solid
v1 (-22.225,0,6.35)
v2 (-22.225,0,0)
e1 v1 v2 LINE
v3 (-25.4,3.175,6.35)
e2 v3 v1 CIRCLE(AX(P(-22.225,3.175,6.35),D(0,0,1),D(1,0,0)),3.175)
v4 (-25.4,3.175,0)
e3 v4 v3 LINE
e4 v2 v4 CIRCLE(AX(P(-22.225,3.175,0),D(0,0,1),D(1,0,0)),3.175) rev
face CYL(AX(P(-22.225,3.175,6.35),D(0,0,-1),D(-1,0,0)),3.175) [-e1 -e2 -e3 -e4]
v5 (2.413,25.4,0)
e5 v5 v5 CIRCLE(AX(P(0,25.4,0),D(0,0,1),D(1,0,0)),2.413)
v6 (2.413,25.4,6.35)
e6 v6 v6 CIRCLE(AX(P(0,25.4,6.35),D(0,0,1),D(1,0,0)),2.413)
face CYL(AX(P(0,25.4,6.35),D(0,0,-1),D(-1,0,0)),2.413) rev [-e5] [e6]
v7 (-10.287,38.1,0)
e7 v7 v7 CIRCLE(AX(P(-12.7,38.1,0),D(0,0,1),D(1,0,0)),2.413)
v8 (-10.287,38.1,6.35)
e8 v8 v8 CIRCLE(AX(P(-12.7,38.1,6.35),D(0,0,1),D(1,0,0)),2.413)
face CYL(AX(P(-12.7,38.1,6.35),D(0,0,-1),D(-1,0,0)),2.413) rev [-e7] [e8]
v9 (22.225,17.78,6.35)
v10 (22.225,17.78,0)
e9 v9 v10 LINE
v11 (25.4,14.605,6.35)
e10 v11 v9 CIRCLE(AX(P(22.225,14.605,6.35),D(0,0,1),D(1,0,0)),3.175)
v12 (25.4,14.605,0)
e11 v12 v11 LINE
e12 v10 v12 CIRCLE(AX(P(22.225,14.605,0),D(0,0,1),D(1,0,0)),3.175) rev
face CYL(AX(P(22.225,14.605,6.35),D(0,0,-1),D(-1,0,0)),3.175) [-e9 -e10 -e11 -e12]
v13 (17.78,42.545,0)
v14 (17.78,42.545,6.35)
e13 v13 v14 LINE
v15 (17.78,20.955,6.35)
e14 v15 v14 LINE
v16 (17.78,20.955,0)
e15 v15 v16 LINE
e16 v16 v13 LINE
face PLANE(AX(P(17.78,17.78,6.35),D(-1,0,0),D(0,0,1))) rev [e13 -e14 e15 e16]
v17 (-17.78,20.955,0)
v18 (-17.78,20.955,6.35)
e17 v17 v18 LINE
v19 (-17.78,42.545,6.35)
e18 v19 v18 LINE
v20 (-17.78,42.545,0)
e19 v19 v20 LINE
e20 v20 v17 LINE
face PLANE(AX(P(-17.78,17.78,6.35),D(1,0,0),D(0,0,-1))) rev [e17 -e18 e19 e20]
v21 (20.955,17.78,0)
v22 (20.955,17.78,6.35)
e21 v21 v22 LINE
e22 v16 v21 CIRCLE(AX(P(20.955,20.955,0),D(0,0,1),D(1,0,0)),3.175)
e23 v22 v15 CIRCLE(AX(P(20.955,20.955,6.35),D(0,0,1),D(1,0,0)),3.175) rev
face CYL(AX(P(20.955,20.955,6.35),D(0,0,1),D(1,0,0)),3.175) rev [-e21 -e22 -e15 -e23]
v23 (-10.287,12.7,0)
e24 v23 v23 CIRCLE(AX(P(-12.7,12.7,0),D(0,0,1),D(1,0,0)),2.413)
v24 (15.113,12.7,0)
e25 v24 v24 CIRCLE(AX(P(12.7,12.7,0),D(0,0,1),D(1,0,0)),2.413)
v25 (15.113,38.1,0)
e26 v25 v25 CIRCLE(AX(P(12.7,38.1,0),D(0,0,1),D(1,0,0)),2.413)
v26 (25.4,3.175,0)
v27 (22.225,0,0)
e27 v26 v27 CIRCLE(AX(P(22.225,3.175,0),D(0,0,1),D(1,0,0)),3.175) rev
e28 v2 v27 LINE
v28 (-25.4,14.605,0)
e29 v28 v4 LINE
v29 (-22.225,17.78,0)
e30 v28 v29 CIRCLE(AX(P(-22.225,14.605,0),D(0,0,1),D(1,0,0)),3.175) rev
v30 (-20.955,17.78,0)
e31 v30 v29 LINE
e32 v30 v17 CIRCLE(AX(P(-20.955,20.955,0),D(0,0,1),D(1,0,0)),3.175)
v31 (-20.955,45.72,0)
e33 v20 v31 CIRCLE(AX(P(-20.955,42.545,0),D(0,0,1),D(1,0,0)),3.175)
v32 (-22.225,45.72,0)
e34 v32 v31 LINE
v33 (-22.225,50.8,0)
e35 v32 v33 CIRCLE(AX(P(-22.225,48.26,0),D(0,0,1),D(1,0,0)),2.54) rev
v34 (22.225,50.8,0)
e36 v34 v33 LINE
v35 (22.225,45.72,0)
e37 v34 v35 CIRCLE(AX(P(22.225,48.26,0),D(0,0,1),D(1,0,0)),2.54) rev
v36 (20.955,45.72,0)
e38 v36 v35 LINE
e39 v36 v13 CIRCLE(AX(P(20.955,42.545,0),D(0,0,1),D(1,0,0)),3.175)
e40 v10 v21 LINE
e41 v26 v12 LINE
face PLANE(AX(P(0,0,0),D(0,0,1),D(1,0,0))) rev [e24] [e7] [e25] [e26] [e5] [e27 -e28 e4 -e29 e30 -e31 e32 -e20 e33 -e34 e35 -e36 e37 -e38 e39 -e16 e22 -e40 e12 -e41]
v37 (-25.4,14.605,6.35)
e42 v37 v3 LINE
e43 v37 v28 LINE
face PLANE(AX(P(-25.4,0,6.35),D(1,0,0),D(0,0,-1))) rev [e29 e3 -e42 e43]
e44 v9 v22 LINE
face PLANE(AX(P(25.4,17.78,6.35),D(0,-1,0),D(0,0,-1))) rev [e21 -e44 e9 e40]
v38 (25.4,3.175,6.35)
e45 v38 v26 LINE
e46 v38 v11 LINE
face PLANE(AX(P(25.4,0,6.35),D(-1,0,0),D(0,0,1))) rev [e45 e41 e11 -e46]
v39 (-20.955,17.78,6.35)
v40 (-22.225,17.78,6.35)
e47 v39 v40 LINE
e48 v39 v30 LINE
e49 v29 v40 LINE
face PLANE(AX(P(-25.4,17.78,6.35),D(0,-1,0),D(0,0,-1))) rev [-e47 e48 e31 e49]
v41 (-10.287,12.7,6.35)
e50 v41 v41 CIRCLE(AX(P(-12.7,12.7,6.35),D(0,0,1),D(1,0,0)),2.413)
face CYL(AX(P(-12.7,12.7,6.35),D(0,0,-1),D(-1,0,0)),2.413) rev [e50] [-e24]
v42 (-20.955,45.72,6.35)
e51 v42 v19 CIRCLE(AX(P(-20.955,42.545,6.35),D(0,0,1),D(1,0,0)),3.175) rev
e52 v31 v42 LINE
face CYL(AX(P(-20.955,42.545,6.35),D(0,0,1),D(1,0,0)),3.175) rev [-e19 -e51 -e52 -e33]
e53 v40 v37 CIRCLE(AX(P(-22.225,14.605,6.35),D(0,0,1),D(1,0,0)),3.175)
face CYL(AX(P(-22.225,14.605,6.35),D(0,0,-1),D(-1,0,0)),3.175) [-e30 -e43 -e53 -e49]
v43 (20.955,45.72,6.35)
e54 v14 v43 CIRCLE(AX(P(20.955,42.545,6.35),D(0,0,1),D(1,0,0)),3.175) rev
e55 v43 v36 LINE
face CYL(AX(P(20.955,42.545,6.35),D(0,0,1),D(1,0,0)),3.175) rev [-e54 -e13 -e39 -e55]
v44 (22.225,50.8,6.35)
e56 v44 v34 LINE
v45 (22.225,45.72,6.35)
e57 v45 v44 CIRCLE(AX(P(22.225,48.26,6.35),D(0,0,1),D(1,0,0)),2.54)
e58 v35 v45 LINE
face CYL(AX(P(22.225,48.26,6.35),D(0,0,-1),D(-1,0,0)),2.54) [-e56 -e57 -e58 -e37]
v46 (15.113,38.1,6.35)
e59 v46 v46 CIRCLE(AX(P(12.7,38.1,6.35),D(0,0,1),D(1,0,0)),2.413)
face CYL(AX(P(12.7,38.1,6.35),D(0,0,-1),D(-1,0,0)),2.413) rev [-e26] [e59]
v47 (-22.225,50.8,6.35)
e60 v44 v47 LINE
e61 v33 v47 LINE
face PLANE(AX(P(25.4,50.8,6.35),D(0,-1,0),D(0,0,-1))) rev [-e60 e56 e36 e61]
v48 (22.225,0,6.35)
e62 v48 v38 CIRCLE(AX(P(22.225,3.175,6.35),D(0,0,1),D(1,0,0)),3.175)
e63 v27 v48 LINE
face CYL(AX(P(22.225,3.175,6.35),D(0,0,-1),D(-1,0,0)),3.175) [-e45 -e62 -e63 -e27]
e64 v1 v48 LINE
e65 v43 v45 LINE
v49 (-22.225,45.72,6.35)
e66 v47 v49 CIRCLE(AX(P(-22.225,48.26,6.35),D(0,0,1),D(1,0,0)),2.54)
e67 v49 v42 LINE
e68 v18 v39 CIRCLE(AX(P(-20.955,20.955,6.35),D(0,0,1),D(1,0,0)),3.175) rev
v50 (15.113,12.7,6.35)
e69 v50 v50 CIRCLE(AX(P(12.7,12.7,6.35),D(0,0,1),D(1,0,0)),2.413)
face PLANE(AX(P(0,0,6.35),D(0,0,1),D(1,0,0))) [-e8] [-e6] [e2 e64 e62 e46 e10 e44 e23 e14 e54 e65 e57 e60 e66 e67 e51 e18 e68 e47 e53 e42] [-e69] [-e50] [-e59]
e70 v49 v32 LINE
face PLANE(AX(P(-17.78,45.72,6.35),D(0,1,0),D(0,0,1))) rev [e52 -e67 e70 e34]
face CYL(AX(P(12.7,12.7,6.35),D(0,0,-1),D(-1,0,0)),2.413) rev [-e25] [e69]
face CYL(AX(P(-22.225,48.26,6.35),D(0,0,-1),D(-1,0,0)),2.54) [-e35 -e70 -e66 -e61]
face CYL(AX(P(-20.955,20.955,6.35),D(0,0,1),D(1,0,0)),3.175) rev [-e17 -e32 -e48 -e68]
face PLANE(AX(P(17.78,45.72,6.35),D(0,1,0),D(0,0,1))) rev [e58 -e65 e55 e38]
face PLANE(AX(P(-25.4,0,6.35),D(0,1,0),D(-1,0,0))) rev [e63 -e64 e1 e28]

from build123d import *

# Parameters (mm, degrees)
SKETCH1_R           = 2.413
BOSS_EXTRUDE1_DEPTH = 6.35
FILLET1_R           = 3.175
FILLET3_R           = 2.54


with BuildPart() as part:
    # Sketch1 → Boss-Extrude1 (new body)
    with BuildSketch(Plane.XY):
        Polygon((-25.4, 0), (25.4, 0), (25.4, 17.78), (17.78, 17.78), (17.78, 45.72), (25.4, 45.72), (25.4, 50.8), (-25.4, 50.8), (-25.4, 45.72), (-17.78, 45.72), (-17.78, 17.78), (-25.4, 17.78), align=None)
        with Locations((-12.7, 12.7)):
            Circle(SKETCH1_R, mode=Mode.SUBTRACT)
        with Locations((12.7, 12.7)):
            Circle(SKETCH1_R, mode=Mode.SUBTRACT)
        with Locations((0, 25.4)):
            Circle(SKETCH1_R, mode=Mode.SUBTRACT)
        with Locations((-12.7, 38.1)):
            Circle(SKETCH1_R, mode=Mode.SUBTRACT)
        with Locations((12.7, 38.1)):
            Circle(SKETCH1_R, mode=Mode.SUBTRACT)
    extrude(amount=BOSS_EXTRUDE1_DEPTH)

    # Fillet1
    # the kernel refuses this fillet: 3.175 mm, written as the material it adds along each edge
    with BuildSketch(Plane(origin=(-17.78, 17.78, 0), x_dir=(0, 1, 0), z_dir=(0, 0, 1)), Plane(origin=(-17.78, 45.72, 0), x_dir=(-1, 0, 0), z_dir=(0, 0, 1)), Plane(origin=(17.78, 45.72, 0), x_dir=(0, -1, 0), z_dir=(0, 0, 1)), Plane(origin=(17.78, 17.78, 0), x_dir=(1, 0, 0), z_dir=(0, 0, 1))) as fillet1_piece_1:
        with BuildLine():
            CenterArc((FILLET1_R, FILLET1_R), FILLET1_R, 180, 90)
            Line((0, FILLET1_R), (0, 0))
            Line((0, 0), (FILLET1_R, 0))
        make_face()
    extrude(amount=6.35)
    # the kernel refuses this fillet: 3.175 mm, written as the material it takes off along each edge
    with BuildSketch(Plane(origin=(25.4, 0, -7.9375), x_dir=(-1, 0, 0), z_dir=(0, 0, 1)), Plane(origin=(-25.4, 45.72, -7.9375), x_dir=(0, 1, 0), z_dir=(0, 0, 1)), Plane(origin=(-25.4, 50.8, -7.9375), x_dir=(1, 0, 0), z_dir=(0, 0, 1)), Plane(origin=(25.4, 50.8, -7.9375), x_dir=(0, -1, 0), z_dir=(0, 0, 1)), Plane(origin=(25.4, 45.72, -7.9375), x_dir=(-1, 0, 0), z_dir=(0, 0, 1)), Plane(origin=(25.4, 17.78, -7.9375), x_dir=(0, -1, 0), z_dir=(0, 0, 1))) as fillet1_2_piece_1:
        with BuildLine():
            CenterArc((FILLET1_R, -FILLET1_R), FILLET1_R, 90, 90)
            Line((0, -FILLET1_R), (0, 0))
            Line((0, 0), (FILLET1_R, 0))
        make_face()
    extrude(amount=22.225, mode=Mode.SUBTRACT)
    with BuildSketch(Plane(origin=(-25.4, 0, -7.9375), x_dir=(1, 0, 0), z_dir=(0, 0, 1)), Plane(origin=(-25.4, 17.78, -7.9375), x_dir=(0, -1, 0), z_dir=(0, 0, 1))) as fillet1_2_piece_2:
        with BuildLine():
            CenterArc((FILLET1_R, FILLET1_R), FILLET1_R, 180, 90)
            Line((0, FILLET1_R), (0, 0))
            Line((0, 0), (FILLET1_R, 0))
        make_face()
    extrude(amount=22.225, mode=Mode.SUBTRACT)

    # Fillet3
    # the kernel refuses this fillet: 2.54 mm, written as the material it takes off along each edge
    with BuildSketch(Plane(origin=(-25.335851973, 48.26, 16.390208023), x_dir=(0.774595457226018, 0.6324570164404979, 0), z_dir=(0, 0, -1))) as fillet3_piece_1:
        with BuildLine():
            CenterArc((2.409649921, 1.967478618), FILLET3_R, 129.231849882, 179.999560802)
            ThreePointArc((0.803201559, 3.934944923), (-0.299592395, 2.110600119), (0, 0))
            ThreePointArc((0, 0), (2.008041601, -0.715651727), (4.016083202, 0))
        make_face()
    extrude(amount=26.430416045, mode=Mode.SUBTRACT)
    with BuildSketch(Plane(origin=(25.335851973, 48.26, 16.390208022), x_dir=(-0.774595458044749, -0.632457015437765, 0), z_dir=(0, 0, -1))) as fillet3_piece_2:
        with BuildLine():
            CenterArc((2.409649925, 1.967478616), FILLET3_R, 129.23184966, 179.999561099)
            ThreePointArc((0.80320157, 3.934944927), (-0.299592391, 2.110600124), (0, 0))
            ThreePointArc((0, 0), (2.008041604, -0.71565173), (4.016083209, 0))
        make_face()
    extrude(amount=26.430416044, mode=Mode.SUBTRACT)


solid = part.part
